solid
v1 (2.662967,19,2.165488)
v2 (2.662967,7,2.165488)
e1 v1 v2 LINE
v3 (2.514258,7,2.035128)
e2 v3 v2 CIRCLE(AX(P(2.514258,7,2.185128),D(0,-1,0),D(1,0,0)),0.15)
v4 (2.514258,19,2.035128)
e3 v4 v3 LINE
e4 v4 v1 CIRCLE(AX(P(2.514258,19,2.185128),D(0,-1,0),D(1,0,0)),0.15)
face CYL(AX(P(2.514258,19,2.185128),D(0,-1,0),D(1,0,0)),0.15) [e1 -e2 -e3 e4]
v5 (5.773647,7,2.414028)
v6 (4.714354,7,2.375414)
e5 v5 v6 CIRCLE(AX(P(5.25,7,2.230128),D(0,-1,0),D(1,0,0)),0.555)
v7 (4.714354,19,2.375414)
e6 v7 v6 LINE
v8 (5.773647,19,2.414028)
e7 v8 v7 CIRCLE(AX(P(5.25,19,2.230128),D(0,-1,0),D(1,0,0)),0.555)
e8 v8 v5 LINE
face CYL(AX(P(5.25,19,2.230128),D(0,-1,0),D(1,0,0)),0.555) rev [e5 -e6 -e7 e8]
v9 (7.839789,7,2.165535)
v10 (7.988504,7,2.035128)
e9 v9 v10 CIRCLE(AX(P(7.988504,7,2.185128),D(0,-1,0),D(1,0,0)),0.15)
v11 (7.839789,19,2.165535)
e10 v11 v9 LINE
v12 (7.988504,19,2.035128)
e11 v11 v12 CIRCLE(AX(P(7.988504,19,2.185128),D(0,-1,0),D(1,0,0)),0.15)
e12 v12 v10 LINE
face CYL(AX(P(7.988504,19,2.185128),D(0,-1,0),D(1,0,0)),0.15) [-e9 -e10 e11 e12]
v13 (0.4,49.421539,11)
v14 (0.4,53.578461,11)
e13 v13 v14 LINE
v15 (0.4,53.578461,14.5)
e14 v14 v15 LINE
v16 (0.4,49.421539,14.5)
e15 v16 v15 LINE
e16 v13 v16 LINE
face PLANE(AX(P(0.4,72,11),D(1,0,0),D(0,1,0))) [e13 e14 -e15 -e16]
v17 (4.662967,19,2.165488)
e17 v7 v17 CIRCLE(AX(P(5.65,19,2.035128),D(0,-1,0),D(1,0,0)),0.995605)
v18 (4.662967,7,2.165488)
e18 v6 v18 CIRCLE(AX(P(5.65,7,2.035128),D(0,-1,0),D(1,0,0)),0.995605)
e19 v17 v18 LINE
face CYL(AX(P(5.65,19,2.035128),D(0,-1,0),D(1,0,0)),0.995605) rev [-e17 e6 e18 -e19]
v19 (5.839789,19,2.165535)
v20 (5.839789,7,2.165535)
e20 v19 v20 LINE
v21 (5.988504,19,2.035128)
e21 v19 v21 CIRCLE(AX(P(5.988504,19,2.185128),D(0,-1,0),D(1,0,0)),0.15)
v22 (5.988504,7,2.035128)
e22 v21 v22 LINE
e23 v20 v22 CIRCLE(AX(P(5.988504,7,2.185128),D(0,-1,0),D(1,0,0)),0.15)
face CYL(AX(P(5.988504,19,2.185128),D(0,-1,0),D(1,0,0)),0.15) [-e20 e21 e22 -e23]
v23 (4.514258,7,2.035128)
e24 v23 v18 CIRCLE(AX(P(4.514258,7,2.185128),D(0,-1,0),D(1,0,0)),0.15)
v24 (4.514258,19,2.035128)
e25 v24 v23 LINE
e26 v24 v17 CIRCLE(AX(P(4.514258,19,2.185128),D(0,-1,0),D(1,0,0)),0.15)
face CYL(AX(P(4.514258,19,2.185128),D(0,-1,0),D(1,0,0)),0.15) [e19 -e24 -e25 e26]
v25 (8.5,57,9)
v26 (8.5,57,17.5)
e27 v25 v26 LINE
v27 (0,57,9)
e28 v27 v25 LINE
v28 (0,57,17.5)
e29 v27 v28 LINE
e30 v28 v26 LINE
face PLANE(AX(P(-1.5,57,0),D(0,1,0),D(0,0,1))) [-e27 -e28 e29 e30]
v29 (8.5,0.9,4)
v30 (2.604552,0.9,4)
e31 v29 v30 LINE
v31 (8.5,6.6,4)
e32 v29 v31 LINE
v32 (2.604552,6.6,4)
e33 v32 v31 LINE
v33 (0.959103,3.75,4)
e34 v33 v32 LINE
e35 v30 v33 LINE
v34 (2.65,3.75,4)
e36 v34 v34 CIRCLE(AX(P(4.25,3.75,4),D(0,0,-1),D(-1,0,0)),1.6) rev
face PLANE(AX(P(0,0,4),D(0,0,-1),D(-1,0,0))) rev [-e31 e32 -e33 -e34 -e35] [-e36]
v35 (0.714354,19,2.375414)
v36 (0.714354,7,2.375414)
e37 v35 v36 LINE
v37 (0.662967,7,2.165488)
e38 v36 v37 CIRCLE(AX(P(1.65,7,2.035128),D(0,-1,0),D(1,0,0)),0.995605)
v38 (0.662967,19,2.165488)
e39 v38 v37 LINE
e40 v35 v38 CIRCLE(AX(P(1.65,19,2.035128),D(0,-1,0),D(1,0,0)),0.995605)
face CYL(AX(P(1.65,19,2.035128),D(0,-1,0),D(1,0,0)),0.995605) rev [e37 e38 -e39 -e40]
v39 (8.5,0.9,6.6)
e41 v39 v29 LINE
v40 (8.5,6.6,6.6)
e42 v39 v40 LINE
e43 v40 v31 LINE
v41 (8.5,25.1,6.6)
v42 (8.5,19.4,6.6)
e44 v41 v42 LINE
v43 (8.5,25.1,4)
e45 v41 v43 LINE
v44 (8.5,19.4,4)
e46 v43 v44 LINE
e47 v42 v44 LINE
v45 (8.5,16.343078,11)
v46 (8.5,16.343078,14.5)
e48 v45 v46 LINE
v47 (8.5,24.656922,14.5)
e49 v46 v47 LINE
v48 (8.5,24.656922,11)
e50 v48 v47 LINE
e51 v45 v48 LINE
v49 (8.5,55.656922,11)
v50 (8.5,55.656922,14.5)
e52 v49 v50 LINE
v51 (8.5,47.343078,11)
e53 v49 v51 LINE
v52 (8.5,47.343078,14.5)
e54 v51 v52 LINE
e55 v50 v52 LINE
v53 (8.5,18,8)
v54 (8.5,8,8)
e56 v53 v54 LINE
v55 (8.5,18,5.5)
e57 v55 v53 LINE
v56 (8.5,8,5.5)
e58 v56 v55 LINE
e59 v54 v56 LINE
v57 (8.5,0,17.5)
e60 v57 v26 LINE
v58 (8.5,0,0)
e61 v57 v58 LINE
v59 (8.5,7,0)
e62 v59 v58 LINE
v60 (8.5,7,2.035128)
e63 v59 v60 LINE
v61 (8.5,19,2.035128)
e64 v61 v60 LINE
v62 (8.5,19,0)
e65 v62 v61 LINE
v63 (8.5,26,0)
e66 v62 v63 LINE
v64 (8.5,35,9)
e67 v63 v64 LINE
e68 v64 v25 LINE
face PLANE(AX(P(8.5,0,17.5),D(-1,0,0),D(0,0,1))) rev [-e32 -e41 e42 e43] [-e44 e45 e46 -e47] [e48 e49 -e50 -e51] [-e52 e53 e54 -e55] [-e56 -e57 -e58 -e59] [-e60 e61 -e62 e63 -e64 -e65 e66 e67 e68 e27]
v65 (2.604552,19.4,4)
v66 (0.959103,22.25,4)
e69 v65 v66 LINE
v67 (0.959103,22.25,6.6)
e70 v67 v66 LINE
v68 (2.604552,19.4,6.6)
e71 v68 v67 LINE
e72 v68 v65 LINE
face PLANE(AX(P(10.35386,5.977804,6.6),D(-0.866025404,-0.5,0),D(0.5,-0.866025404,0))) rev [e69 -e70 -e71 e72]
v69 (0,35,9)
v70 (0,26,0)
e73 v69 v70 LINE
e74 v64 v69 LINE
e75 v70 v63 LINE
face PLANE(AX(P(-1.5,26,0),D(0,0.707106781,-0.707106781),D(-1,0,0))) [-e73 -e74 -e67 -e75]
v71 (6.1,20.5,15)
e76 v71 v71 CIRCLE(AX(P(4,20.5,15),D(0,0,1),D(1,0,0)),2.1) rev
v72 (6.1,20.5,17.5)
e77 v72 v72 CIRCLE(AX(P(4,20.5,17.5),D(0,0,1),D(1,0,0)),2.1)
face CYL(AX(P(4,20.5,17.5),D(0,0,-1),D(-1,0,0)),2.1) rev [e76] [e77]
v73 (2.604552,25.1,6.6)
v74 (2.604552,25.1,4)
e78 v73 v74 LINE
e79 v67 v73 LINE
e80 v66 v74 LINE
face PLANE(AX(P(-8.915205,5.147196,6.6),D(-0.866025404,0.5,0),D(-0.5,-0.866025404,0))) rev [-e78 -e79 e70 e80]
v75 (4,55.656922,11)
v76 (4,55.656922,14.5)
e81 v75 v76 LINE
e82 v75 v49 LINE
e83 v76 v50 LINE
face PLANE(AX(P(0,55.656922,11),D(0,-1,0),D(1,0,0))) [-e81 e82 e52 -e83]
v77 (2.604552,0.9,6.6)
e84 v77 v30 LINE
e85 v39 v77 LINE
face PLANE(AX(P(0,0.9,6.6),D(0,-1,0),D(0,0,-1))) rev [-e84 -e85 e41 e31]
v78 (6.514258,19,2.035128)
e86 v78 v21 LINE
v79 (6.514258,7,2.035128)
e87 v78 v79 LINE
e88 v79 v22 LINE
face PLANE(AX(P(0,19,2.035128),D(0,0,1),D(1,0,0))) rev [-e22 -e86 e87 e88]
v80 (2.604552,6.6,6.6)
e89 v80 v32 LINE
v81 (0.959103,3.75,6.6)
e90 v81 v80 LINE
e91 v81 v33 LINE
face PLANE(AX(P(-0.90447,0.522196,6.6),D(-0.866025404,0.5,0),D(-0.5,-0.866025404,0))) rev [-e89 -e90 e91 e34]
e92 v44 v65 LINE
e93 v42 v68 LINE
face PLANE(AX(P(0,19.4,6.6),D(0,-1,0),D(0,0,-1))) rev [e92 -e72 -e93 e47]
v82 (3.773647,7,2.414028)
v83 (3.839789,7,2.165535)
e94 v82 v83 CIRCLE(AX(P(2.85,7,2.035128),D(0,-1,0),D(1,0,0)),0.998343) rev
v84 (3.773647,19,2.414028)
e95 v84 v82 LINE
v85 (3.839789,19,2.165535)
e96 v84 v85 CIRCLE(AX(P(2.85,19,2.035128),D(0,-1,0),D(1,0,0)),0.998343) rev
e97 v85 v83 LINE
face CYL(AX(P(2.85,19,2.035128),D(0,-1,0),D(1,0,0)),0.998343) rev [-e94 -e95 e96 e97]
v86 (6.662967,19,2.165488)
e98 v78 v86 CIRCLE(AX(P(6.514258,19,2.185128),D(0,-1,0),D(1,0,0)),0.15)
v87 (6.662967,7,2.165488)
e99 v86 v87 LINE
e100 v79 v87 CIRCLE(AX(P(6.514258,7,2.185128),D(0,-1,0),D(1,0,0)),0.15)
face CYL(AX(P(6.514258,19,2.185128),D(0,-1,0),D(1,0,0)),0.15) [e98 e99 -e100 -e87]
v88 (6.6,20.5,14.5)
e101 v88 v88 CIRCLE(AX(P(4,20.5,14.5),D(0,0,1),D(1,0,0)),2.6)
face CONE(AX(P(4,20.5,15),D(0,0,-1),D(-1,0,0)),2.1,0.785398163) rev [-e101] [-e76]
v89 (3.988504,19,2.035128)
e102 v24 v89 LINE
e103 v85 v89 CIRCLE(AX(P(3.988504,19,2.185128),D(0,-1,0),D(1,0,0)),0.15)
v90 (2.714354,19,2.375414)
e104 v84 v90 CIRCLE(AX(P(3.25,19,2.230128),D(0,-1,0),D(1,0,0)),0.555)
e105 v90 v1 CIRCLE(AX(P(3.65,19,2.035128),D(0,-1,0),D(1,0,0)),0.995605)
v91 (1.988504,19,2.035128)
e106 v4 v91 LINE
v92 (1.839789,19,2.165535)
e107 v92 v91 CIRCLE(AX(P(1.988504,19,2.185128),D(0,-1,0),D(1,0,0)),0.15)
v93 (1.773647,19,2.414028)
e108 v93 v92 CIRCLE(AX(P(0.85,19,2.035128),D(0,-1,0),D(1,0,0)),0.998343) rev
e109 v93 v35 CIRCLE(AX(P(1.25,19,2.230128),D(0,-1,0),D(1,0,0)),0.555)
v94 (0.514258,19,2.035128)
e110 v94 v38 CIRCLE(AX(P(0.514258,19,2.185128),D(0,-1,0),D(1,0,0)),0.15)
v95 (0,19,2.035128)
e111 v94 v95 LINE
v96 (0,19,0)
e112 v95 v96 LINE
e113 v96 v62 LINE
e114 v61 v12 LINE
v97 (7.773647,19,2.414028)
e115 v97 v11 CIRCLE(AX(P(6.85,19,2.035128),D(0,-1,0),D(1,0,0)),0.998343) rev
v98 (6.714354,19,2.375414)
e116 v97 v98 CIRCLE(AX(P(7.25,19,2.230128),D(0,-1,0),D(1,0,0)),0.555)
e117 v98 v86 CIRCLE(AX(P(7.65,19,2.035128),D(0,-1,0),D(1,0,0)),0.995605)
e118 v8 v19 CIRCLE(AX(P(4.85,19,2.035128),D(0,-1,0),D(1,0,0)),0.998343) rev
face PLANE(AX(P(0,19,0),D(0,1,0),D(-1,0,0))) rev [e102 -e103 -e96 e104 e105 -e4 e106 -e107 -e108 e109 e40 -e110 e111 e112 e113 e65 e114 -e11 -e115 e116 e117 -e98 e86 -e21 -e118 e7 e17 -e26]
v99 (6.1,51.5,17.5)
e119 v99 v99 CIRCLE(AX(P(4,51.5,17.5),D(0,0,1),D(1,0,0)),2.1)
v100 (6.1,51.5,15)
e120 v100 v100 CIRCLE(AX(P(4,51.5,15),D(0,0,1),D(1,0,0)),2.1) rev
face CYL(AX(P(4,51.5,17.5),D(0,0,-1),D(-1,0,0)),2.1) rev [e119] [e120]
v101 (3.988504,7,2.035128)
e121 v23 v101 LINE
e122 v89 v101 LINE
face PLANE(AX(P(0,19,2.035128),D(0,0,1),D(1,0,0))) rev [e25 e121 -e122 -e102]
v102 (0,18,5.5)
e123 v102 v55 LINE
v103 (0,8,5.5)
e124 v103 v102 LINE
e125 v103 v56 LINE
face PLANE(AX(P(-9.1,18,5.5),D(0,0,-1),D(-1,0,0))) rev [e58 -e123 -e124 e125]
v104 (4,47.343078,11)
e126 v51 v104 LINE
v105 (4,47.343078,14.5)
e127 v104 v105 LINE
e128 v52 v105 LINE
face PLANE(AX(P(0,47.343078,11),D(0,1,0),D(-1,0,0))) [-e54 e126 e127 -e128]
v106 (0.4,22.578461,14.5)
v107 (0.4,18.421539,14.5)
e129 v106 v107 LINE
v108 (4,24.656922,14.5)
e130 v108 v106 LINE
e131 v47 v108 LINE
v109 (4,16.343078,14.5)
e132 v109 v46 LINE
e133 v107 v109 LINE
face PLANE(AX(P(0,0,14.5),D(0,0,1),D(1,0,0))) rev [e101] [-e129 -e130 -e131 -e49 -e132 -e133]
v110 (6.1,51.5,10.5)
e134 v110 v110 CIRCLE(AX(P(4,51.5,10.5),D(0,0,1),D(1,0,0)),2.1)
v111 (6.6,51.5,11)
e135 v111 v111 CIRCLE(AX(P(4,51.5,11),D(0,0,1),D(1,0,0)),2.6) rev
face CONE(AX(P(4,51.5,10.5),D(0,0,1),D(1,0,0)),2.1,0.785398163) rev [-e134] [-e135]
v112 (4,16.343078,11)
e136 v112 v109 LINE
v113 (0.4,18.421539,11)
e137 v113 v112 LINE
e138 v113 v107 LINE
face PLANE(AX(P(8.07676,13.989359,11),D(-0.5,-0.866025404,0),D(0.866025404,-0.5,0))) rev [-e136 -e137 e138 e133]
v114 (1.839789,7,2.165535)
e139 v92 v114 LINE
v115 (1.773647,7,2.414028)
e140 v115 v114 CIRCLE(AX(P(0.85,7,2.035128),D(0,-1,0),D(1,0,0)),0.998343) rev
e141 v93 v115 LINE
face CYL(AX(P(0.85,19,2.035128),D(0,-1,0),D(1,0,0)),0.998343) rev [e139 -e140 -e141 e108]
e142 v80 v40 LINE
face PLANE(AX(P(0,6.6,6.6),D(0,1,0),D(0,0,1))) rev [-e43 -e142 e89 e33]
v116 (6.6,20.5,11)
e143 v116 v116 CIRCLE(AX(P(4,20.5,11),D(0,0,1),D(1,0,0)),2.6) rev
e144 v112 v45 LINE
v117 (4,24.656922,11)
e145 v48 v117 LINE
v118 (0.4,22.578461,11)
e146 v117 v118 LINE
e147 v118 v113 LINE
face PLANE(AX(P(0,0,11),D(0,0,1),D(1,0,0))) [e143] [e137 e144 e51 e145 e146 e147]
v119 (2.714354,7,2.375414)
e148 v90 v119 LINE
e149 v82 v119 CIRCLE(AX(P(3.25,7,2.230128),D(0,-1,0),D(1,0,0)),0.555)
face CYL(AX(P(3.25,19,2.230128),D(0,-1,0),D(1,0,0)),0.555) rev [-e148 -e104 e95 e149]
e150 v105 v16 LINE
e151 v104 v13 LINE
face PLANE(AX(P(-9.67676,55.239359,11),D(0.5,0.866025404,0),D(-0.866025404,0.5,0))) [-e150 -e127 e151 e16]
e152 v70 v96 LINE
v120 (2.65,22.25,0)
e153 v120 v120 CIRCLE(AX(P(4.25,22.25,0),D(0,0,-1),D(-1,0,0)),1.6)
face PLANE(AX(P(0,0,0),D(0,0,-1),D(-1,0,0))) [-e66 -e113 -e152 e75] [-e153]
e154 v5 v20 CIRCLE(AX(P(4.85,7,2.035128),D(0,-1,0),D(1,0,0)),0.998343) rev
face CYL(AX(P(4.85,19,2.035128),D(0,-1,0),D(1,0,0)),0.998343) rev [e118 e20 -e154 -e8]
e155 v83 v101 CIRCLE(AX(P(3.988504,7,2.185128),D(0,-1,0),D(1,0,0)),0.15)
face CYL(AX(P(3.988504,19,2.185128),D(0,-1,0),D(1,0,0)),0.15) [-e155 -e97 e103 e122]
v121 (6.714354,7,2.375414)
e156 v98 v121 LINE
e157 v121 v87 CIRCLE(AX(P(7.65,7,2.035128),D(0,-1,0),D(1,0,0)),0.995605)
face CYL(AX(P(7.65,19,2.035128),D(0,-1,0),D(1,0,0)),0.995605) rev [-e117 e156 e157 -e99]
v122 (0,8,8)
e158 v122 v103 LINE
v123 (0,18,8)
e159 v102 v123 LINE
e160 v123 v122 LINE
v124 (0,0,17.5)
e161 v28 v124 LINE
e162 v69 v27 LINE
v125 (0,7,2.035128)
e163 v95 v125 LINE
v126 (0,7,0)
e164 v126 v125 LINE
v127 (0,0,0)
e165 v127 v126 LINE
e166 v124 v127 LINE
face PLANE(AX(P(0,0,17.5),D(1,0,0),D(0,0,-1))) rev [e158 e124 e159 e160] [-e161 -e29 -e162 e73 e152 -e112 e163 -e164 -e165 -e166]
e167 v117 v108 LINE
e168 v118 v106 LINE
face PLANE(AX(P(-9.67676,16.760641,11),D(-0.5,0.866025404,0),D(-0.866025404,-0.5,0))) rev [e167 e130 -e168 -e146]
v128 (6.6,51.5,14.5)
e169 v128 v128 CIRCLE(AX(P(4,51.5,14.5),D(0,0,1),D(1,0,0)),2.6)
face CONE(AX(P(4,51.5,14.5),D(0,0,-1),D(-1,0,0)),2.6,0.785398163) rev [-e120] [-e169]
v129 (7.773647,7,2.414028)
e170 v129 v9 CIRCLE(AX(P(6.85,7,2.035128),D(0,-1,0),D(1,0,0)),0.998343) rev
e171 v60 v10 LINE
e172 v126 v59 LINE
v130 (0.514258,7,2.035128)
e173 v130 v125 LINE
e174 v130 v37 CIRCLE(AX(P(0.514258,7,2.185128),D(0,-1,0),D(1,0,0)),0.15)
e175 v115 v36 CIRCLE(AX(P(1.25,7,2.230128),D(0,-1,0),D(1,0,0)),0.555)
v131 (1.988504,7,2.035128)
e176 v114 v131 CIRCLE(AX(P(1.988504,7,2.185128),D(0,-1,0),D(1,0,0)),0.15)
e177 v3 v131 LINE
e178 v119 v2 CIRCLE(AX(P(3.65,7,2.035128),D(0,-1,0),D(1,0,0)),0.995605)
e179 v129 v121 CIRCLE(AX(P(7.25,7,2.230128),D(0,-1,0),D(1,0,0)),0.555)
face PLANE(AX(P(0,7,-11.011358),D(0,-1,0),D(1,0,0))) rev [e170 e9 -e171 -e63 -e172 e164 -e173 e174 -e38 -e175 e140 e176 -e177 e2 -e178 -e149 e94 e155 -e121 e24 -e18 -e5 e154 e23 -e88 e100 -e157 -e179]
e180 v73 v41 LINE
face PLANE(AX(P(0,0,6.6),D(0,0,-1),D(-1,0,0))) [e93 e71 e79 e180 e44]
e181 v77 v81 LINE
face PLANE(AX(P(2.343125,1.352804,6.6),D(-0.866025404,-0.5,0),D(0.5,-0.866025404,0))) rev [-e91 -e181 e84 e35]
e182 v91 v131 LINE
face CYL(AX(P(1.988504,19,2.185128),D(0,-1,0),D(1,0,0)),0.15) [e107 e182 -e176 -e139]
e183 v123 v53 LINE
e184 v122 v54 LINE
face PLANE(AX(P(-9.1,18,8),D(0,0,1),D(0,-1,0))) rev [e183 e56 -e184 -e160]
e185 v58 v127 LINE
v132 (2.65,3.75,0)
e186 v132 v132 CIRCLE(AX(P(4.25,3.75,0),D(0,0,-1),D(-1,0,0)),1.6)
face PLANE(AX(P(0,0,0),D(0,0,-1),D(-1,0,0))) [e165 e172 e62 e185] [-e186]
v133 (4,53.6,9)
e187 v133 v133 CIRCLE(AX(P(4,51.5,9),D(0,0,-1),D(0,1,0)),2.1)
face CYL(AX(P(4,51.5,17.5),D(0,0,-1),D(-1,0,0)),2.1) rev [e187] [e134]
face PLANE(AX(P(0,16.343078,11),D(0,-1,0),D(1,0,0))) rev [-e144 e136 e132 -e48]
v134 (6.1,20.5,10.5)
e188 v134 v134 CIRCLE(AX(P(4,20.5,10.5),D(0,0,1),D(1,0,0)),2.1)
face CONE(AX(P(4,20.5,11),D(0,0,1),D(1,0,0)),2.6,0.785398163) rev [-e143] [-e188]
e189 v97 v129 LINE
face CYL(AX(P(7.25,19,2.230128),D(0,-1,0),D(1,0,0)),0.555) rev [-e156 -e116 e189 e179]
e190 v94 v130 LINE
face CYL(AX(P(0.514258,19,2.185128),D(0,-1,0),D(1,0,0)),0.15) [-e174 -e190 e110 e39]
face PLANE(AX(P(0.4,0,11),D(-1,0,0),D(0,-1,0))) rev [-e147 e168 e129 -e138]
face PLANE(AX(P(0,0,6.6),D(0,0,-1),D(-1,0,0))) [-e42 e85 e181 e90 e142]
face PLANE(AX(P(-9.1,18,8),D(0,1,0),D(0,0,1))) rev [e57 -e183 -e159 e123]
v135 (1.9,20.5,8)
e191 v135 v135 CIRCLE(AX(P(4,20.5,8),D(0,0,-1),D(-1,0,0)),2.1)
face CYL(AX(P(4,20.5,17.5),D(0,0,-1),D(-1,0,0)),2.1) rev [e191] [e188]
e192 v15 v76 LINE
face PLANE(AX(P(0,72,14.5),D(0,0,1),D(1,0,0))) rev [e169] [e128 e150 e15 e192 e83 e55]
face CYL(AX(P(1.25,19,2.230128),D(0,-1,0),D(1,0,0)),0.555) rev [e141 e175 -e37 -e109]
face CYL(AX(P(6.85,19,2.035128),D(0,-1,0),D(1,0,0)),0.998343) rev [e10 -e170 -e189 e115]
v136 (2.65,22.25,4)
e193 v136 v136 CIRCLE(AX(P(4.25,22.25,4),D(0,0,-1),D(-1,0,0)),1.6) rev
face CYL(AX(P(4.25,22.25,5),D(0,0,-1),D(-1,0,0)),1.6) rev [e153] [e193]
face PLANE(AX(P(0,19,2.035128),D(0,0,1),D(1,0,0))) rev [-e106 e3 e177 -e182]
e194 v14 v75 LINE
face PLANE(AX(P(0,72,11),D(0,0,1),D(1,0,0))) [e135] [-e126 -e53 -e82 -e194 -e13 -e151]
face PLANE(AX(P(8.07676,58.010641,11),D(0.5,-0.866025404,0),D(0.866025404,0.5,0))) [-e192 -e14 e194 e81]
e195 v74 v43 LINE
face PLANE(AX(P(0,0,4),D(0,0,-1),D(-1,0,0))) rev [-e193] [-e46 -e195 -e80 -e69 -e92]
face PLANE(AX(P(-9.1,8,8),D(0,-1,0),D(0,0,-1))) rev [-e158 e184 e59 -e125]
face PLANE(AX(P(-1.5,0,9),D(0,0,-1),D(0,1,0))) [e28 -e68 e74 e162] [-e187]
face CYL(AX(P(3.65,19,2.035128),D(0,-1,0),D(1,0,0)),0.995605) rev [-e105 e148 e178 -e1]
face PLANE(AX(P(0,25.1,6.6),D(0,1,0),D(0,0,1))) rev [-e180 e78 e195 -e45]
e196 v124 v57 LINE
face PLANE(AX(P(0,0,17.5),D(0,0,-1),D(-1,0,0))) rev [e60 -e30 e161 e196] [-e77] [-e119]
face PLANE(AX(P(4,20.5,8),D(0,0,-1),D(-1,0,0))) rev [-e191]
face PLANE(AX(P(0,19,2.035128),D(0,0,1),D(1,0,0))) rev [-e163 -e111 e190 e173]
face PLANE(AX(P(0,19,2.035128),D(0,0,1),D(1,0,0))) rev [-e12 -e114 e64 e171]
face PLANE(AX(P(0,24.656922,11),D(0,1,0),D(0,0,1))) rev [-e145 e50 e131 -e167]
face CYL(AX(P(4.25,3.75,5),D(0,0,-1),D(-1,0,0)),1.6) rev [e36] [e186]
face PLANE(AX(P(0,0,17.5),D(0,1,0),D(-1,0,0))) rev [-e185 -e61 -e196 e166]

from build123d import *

# Parameters (mm, degrees)
ESQUISSE1_W              = 8.5
ESQUISSE1_H              = 72
ESQUISSE1_R              = 2.1
BOSS_EXTRU_1_DEPTH       = 17.5
ENL_V_START              = -3
ENL_V_MAT_EXTRU_4_DEPTH  = 3.5
ESQUISSE7_R              = 2.1
BOSS_EXTRU_3_DEPTH       = 8
ESQUISSE3_W              = 8.5
ESQUISSE3_H              = 4
ENL_V_MAT_EXTRU_3_DEPTH  = 19
BOSS_EXTRU_2_START       = -7
BOSS_EXTRU_2_DEPTH       = 12
ESQUISSE8_W              = 8.5
ESQUISSE8_H              = 7
BOSS_EXTRU_4_DEPTH       = 4
ESQUISSE9_R              = 1.6
ENL_V_MAT_EXTRU_5_DEPTH  = 5
ENL_V_START_2            = -4
ESQUISSE10_R             = 1.6
ENL_V_MAT_EXTRU_6_DEPTH  = 2.6
ESQUISSE11_R             = 1.6
ENL_V_MAT_EXTRU_7_DEPTH  = 1.6
ESQUISSE14_W             = 2.5
ESQUISSE14_H             = 10
ENL_V_MAT_EXTRU_9_DEPTH  = 17.6
CHANFREIN1_SIZE          = 0.5
ESQUISSE15_W             = 2.6
ESQUISSE15_H             = 5.7
ESQUISSE15_W_2           = 2.5
ESQUISSE15_H_2           = 10
ESQUISSE15_W_3           = 8.5
ESQUISSE15_H_3           = 15
ENL_V_MAT_EXTRU_10_DEPTH = 10
CHANFREIN2_SIZE          = 9


with BuildPart() as part:
    # Esquisse1 → Boss.-Extru.1 (new body)
    with BuildSketch(Plane.XY):
        with Locations((4.25, 36)):
            Rectangle(ESQUISSE1_W, ESQUISSE1_H)
        with Locations((4, 20.5)):
            Circle(ESQUISSE1_R, mode=Mode.SUBTRACT)
        with Locations((4, 51.5)):
            Circle(ESQUISSE1_R, mode=Mode.SUBTRACT)
    extrude(amount=BOSS_EXTRU_1_DEPTH)

    # Esquisse6 → Enlèv. mat.-Extru.4 (cut)
    with BuildSketch(Plane.XY.offset(17.5).offset(ENL_V_START)):
        Polygon((7.6, 22.578460969), (4, 24.656921938), (0.4, 22.578460969), (0.4, 18.421539031), (4, 16.343078062), (7.6, 18.421539031), align=None)
        Polygon((8.5, 24.656921938), (4, 24.656921938), (7.6, 22.578460969), (7.6, 18.421539031), (4, 16.343078062), (8.5, 16.343078062), align=None)
    enl_v_mat_extru_4 = extrude(amount=-ENL_V_MAT_EXTRU_4_DEPTH, mode=Mode.SUBTRACT)

    # Esquisse7 → Boss.-Extru.3 (add)
    with BuildSketch(Plane(origin=(0, 0, 0), x_dir=(-1, 0, 0), z_dir=(0, 0, -1))):
        with Locations((-4, 20.5)):
            Circle(ESQUISSE7_R)
    boss_extru_3 = extrude(amount=-BOSS_EXTRU_3_DEPTH)

    # Esquisse3 → Enlèv. mat.-Extru.3 (cut)
    with BuildSketch(Plane(origin=(0, 0, 0), x_dir=(-1, 0, 0), z_dir=(0, -1, 0))):
        with Locations((-4.25, -2)):
            Rectangle(ESQUISSE3_W, ESQUISSE3_H)
    enl_v_mat_extru_3 = extrude(amount=-ENL_V_MAT_EXTRU_3_DEPTH, mode=Mode.SUBTRACT)

    # Esquisse5 → Boss.-Extru.2 (add)
    with BuildSketch(Plane.XZ.offset(BOSS_EXTRU_2_START)):
        with BuildLine():
            ThreePointArc((4.662966643, 2.165487935), (4.682946936, 2.27184931), (4.714353535, 2.375413685))
            ThreePointArc((4.714353535, 2.375413685), (5.229781903, 2.78475984), (5.773646598, 2.414028307))
            ThreePointArc((5.773646598, 2.414028307), (5.814751932, 2.291920009), (5.839789089, 2.165534781))
            ThreePointArc((5.839789089, 2.165534781), (5.889607538, 2.072347427), (5.988503907, 2.035128225))
            Line((5.988503907, 2.035128225), (6.514258005, 2.035128225))
            ThreePointArc((6.514258005, 2.035128225), (6.613136609, 2.072331852), (6.662966643, 2.165487935))
            ThreePointArc((6.662966643, 2.165487935), (6.682946936, 2.27184931), (6.714353535, 2.375413685))
            ThreePointArc((6.714353535, 2.375413685), (7.229781903, 2.78475984), (7.773646598, 2.414028307))
            ThreePointArc((7.773646598, 2.414028307), (7.814751932, 2.291920009), (7.839789089, 2.165534781))
            ThreePointArc((7.839789089, 2.165534781), (7.889607538, 2.072347427), (7.988503907, 2.035128225))
            Line((7.988503907, 2.035128225), (8.5, 2.035128225))
            Line((8.5, 2.035128225), (8.5, 4))
            Line((8.5, 4), (0, 4))
            Line((0, 4), (0, 2.035128225))
            Line((0, 2.035128225), (0.514258005, 2.035128225))
            ThreePointArc((0.514258005, 2.035128225), (0.61313661, 2.072331853), (0.662966644, 2.165487937))
            ThreePointArc((0.662966644, 2.165487937), (0.682946936, 2.271849312), (0.714353535, 2.375413685))
            ThreePointArc((0.714353535, 2.375413685), (1.229781903, 2.78475984), (1.773646598, 2.414028307))
            ThreePointArc((1.773646598, 2.414028307), (1.814751932, 2.291920009), (1.839789089, 2.165534781))
            ThreePointArc((1.839789089, 2.165534781), (1.889607538, 2.072347427), (1.988503907, 2.035128225))
            Line((1.988503907, 2.035128225), (2.514258006, 2.035128225))
            ThreePointArc((2.514258006, 2.035128225), (2.613136611, 2.072331854), (2.662966644, 2.16548794))
            ThreePointArc((2.662966644, 2.16548794), (2.682946936, 2.271849313), (2.714353535, 2.375413685))
            ThreePointArc((2.714353535, 2.375413685), (3.229781903, 2.78475984), (3.773646598, 2.414028307))
            ThreePointArc((3.773646598, 2.414028307), (3.814751932, 2.291920009), (3.839789089, 2.165534781))
            ThreePointArc((3.839789089, 2.165534781), (3.889607538, 2.072347427), (3.988503907, 2.035128225))
            Line((3.988503907, 2.035128225), (4.514258005, 2.035128225))
            ThreePointArc((4.514258005, 2.035128225), (4.613136609, 2.072331852), (4.662966643, 2.165487935))
        make_face()
    boss_extru_2 = extrude(amount=-BOSS_EXTRU_2_DEPTH)

    # Esquisse8 → Boss.-Extru.4 (add)
    with BuildSketch(Plane(origin=(0, 0, 4), x_dir=(-1, 0, 0), z_dir=(0, 0, -1))):
        with Locations((-4.25, 3.5)):
            Rectangle(ESQUISSE8_W, ESQUISSE8_H)
    boss_extru_4 = extrude(amount=BOSS_EXTRU_4_DEPTH)

    # Esquisse9 → Enlèv. mat.-Extru.5 (cut)
    with BuildSketch(Plane(origin=(0, 0, 0), x_dir=(-1, 0, 0), z_dir=(0, 0, -1))):
        with Locations((-4.25, 3.75)):
            Circle(ESQUISSE9_R)
        with Locations((-4.25, 22.25)):
            Circle(ESQUISSE9_R)
    enl_v_mat_extru_5 = extrude(amount=-ENL_V_MAT_EXTRU_5_DEPTH, mode=Mode.SUBTRACT)

    # Esquisse10 → Enlèv. mat.-Extru.6 (cut)
    # profile 1 of 4: a face of its own
    with BuildSketch(Plane(origin=(0, 0, 0), x_dir=(-1, 0, 0), z_dir=(0, 0, -1)).offset(ENL_V_START_2)):
        Polygon((-2.604551733, 25.1), (-5.895448267, 25.1), (-7.540896534, 22.25), (-5.895448267, 19.4), (-2.604551733, 19.4), (-0.959103466, 22.25), align=None)
        with Locations((-4.25, 22.25)):
            Circle(ESQUISSE10_R, mode=Mode.SUBTRACT)
    # profile 2 of 4: a face of its own
    with BuildSketch(Plane(origin=(0, 0, 0), x_dir=(-1, 0, 0), z_dir=(0, 0, -1)).offset(ENL_V_START_2)):
        Polygon((-2.604551733, 6.6), (-5.895448267, 6.6), (-7.540896534, 3.75), (-5.895448267, 0.9), (-2.604551733, 0.9), (-0.959103466, 3.75), align=None)
    # profile 3 of 4: a face of its own
    with BuildSketch(Plane(origin=(0, 0, 0), x_dir=(-1, 0, 0), z_dir=(0, 0, -1)).offset(ENL_V_START_2)):
        Polygon((-8.5, 6.6), (-5.895448267, 6.6), (-7.540896534, 3.75), (-5.895448267, 0.9), (-8.5, 0.9), align=None)
    # profile 4 of 4: a face of its own
    with BuildSketch(Plane(origin=(0, 0, 0), x_dir=(-1, 0, 0), z_dir=(0, 0, -1)).offset(ENL_V_START_2)):
        Polygon((-7.540896534, 22.25), (-5.895448267, 25.1), (-8.5, 25.1), (-8.5, 19.4), (-5.895448267, 19.4), align=None)
    enl_v_mat_extru_6 = extrude(amount=-ENL_V_MAT_EXTRU_6_DEPTH, mode=Mode.SUBTRACT)

    # Esquisse11 → Enlèv. mat.-Extru.7 (cut)
    with BuildSketch(Plane(origin=(0, 0, 5), x_dir=(-1, 0, 0), z_dir=(0, 0, -1))):
        with Locations((-4.25, 22.25)):
            Circle(ESQUISSE11_R)
    enl_v_mat_extru_7 = extrude(amount=-ENL_V_MAT_EXTRU_7_DEPTH, mode=Mode.SUBTRACT)

    # Esquisse14 → Enlèv. mat.-Extru.9 (cut)
    with BuildSketch(Plane(origin=(8.5, 0, 0), x_dir=(0, 0, -1), z_dir=(1, 0, 0))):
        with Locations((-6.75, 13)):
            Rectangle(ESQUISSE14_W, ESQUISSE14_H)
    enl_v_mat_extru_9 = extrude(amount=-ENL_V_MAT_EXTRU_9_DEPTH, mode=Mode.SUBTRACT)

    # Symétrie14: Enlèv. mat.-Extru.4, Boss.-Extru.3, Enlèv. mat.-Extru.3, Boss.-Extru.2, Boss.-Extru.4, Enlèv. mat.-Extru.5, Enlèv. mat.-Extru.6, Enlèv. mat.-Extru.7, Enlèv. mat.-Extru.9 across plane
    add(enl_v_mat_extru_4.mirror(Plane(origin=(0, 36, 0), x_dir=(0, 0, 1), z_dir=(0, -1, 0))), mode=Mode.SUBTRACT)
    add(boss_extru_3.mirror(Plane(origin=(0, 36, 0), x_dir=(0, 0, 1), z_dir=(0, -1, 0))))
    add(enl_v_mat_extru_3.mirror(Plane(origin=(0, 36, 0), x_dir=(0, 0, 1), z_dir=(0, -1, 0))), mode=Mode.SUBTRACT)
    add(boss_extru_2.mirror(Plane(origin=(0, 36, 0), x_dir=(0, 0, 1), z_dir=(0, -1, 0))))
    add(boss_extru_4.mirror(Plane(origin=(0, 36, 0), x_dir=(0, 0, 1), z_dir=(0, -1, 0))))
    add(enl_v_mat_extru_5.mirror(Plane(origin=(0, 36, 0), x_dir=(0, 0, 1), z_dir=(0, -1, 0))), mode=Mode.SUBTRACT)
    add(enl_v_mat_extru_6.mirror(Plane(origin=(0, 36, 0), x_dir=(0, 0, 1), z_dir=(0, -1, 0))), mode=Mode.SUBTRACT)
    add(enl_v_mat_extru_7.mirror(Plane(origin=(0, 36, 0), x_dir=(0, 0, 1), z_dir=(0, -1, 0))), mode=Mode.SUBTRACT)
    add(enl_v_mat_extru_9.mirror(Plane(origin=(0, 36, 0), x_dir=(0, 0, 1), z_dir=(0, -1, 0))), mode=Mode.SUBTRACT)

    # Chanfrein1
    chanfrein1_edges = [part.edges().sort_by_distance(p)[0] for p in [
        (1.9, 51.5, 14.5),
        (1.9, 51.5, 11),
        (1.9, 20.5, 11),
        (1.9, 20.5, 14.5),
    ]]
    chamfer(chanfrein1_edges, length=CHANFREIN1_SIZE)

    # Esquisse15 → Enlèv. mat.-Extru.10 (cut)
    # profile 1 of 2: a face of its own
    with BuildSketch(Plane(origin=(8.5, 0, 0), x_dir=(0, 0, -1), z_dir=(1, 0, 0))):
        Polygon((-9, 26), (0, 26), (0, 53), (-2.035128225, 53), (-2.035128225, 65), (0, 65), (0, 72), (-9, 72), (-9, 57), align=None)
        with Locations((-5.3, 49.75)):
            Rectangle(ESQUISSE15_W, ESQUISSE15_H, mode=Mode.SUBTRACT)
        with Locations((-6.75, 59)):
            Rectangle(ESQUISSE15_W_2, ESQUISSE15_H_2, mode=Mode.SUBTRACT)
        with Locations((-5.3, 68.25)):
            Rectangle(ESQUISSE15_W, ESQUISSE15_H, mode=Mode.SUBTRACT)
    # profile 2 of 2: a face of its own
    with BuildSketch(Plane(origin=(8.5, 0, 0), x_dir=(0, 0, -1), z_dir=(1, 0, 0))):
        with Locations((-13.25, 64.5)):
            Rectangle(ESQUISSE15_W_3, ESQUISSE15_H_3)
    extrude(amount=-ENL_V_MAT_EXTRU_10_DEPTH, mode=Mode.SUBTRACT)


with BuildPart() as enl_v_mat_extru_10_kept_piece:
    # of the separate pieces the step leaves, the one the design keeps (enl_v_mat_extru_10_pieces_kept)
    add(part.part.solids().sort_by_distance((6.6, 20.5, 14.5))[0])

    # Chanfrein2
    chanfrein2_edges = [enl_v_mat_extru_10_kept_piece.edges().sort_by_distance(p)[0] for p in [
        (4.25, 26, 9),
    ]]
    chamfer(chanfrein2_edges, length=CHANFREIN2_SIZE - 0.0001)  # a hair under: the kernel refuses the full size


solid = enl_v_mat_extru_10_kept_piece.part
